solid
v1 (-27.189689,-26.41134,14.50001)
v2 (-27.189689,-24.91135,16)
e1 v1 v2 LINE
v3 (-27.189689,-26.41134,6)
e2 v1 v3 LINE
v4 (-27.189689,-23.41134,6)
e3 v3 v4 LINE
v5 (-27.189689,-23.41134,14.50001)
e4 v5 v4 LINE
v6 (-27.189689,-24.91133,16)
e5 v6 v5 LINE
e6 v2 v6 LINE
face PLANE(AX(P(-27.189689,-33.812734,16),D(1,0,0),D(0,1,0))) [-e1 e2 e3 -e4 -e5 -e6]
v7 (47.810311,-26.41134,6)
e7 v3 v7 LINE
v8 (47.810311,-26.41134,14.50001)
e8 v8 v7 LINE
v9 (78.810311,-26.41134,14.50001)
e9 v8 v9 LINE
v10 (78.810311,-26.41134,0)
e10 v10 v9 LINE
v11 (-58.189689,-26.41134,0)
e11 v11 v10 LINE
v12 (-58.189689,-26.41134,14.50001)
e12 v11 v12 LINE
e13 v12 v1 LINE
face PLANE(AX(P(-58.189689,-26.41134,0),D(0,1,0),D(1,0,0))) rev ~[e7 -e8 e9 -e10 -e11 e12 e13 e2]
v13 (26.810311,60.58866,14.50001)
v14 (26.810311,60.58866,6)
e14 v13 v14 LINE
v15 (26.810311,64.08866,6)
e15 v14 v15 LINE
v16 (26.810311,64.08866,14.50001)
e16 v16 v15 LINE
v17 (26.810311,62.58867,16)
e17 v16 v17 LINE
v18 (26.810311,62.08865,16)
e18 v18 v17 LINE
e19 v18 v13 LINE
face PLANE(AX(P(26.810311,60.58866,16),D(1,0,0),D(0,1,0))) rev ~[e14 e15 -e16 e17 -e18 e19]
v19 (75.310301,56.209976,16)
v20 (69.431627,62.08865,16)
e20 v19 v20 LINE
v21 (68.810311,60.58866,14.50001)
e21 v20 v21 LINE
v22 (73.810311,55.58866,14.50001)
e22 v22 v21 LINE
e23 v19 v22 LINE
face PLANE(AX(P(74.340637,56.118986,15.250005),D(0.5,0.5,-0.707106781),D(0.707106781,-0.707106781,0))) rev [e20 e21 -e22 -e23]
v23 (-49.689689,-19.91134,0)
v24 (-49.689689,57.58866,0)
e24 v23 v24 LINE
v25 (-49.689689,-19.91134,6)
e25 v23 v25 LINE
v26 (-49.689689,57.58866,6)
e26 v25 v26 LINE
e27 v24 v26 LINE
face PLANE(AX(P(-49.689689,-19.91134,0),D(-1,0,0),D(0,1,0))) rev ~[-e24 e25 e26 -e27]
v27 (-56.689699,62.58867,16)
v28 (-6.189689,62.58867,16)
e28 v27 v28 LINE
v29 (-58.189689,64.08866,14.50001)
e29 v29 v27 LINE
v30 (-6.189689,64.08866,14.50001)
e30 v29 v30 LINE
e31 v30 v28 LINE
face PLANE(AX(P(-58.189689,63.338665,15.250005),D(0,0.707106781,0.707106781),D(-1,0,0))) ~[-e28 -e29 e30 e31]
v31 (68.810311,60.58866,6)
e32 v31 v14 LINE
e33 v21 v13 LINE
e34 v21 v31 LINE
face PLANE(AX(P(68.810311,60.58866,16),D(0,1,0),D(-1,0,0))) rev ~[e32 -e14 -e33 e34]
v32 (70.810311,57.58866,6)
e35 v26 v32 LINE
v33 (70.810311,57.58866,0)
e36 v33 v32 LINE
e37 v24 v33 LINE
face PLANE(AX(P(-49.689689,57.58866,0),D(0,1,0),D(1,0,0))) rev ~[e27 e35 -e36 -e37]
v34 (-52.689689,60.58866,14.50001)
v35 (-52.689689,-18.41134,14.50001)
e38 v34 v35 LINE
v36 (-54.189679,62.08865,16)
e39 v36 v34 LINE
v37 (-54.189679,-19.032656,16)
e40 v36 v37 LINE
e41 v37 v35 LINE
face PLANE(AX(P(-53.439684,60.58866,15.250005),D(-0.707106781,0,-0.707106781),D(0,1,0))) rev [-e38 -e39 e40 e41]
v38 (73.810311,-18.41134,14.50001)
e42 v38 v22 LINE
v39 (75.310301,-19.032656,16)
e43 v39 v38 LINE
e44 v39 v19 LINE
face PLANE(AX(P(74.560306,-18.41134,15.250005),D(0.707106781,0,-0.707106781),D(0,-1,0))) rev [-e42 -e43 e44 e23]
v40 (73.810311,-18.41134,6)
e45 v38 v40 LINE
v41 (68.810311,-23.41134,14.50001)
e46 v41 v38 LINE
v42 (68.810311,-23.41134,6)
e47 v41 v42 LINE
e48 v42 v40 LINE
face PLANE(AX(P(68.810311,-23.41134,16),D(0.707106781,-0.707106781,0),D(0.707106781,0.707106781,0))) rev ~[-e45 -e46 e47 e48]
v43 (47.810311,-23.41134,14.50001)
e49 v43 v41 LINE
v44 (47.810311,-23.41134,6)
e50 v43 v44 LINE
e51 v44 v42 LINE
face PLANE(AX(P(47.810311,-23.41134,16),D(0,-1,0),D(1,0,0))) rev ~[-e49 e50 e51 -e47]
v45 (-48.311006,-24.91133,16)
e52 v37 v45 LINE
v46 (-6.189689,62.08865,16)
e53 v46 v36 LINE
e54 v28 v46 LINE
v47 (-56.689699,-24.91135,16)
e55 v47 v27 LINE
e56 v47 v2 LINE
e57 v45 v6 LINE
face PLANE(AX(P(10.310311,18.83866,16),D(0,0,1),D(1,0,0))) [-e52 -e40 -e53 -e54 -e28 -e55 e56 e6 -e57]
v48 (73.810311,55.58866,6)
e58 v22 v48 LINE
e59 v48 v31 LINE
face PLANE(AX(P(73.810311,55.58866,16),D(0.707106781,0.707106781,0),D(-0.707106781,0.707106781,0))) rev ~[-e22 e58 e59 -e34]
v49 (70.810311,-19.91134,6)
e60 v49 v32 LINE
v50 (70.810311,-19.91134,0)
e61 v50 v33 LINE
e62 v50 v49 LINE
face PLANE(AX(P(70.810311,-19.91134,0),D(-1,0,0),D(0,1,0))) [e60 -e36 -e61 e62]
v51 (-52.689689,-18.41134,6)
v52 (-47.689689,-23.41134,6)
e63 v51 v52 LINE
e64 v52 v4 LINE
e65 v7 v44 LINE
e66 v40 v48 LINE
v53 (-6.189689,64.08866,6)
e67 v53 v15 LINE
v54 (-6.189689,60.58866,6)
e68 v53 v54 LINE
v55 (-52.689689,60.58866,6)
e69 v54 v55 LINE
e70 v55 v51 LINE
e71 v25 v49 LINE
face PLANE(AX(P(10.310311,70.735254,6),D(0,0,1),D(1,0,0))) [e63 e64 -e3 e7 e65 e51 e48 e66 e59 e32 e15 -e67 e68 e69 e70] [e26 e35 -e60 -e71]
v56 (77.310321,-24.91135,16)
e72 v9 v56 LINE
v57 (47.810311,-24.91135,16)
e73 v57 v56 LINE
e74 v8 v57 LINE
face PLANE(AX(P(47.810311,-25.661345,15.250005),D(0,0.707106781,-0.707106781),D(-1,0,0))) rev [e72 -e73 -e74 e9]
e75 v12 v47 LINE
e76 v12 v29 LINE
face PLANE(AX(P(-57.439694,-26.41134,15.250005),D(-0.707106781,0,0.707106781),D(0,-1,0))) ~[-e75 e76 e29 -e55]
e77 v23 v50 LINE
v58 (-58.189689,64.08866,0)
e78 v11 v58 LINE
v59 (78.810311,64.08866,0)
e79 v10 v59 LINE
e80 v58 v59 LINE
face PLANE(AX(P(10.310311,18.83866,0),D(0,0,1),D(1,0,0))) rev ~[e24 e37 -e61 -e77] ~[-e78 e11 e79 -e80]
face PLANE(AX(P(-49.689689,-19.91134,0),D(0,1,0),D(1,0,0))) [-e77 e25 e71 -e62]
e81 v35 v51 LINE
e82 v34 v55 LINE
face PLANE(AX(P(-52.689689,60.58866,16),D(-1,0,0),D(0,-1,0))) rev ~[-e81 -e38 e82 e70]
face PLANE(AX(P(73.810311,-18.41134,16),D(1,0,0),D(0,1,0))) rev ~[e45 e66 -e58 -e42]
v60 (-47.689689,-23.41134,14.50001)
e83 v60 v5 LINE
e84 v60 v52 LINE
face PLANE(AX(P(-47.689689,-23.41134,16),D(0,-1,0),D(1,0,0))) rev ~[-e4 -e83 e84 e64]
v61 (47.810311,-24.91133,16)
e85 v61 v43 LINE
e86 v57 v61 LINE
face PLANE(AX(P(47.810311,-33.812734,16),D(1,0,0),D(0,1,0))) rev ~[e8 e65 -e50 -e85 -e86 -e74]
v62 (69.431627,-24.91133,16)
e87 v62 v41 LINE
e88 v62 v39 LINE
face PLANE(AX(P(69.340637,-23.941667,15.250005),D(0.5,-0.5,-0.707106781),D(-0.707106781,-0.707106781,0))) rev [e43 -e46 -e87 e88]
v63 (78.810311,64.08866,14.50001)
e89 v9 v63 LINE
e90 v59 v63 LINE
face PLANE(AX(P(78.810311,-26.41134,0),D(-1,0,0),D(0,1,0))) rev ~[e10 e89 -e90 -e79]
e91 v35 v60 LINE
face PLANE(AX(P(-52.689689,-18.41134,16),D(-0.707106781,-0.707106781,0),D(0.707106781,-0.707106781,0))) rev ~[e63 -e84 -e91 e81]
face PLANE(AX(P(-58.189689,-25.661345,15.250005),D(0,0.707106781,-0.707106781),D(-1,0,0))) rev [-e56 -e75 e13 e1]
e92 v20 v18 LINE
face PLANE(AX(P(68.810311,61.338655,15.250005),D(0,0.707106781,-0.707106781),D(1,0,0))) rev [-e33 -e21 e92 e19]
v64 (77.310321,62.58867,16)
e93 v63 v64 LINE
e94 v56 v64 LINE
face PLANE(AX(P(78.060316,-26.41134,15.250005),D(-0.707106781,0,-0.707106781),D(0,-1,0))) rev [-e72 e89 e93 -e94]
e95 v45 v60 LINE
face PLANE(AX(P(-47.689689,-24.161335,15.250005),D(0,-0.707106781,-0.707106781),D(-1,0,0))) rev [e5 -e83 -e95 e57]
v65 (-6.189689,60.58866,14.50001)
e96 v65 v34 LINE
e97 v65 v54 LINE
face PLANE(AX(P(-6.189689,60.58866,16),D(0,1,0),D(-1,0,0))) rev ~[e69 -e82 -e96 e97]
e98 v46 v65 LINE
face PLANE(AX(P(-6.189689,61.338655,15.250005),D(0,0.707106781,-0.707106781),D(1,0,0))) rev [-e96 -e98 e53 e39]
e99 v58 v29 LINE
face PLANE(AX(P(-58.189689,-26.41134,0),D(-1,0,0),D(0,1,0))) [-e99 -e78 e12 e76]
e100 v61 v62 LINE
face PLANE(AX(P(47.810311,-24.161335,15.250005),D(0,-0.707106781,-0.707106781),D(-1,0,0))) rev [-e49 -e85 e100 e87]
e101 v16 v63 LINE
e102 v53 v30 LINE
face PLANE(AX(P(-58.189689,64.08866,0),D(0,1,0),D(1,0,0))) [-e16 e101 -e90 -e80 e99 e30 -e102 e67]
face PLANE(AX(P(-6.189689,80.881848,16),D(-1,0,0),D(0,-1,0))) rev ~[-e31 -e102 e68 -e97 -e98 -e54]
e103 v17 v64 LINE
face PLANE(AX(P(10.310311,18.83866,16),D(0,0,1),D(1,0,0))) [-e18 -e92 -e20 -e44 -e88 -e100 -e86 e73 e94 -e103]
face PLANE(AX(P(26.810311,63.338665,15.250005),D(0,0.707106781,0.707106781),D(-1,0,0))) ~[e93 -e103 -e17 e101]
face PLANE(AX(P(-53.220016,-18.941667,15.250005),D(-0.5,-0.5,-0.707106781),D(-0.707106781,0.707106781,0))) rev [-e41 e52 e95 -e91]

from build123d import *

# Parameters (mm, degrees)
F0_W     = 137
F0_H     = 90.5
F0_W_2   = 120.5
F0_H_2   = 77.5
F1_DEPTH = 16
F3_W     = 33
F3_H     = 20.2931881964
F3_H_2   = 28.397909285
F3_W_2   = 75
F3_H_3   = 9.5986060599
F3_H_4   = 10.4013939401
F4_DEPTH = 10
F5_SIZE  = 1.49999


# Not quite as in the source:
# - a fillet or chamfer is up to 0.001 mm smaller than in the source, because OpenCascade refuses the exact size
# - a feature names something its author has since deleted; it is built from what else it names


with BuildPart() as f1:
    # F0 (on Top) → F1 (new body)
    with BuildSketch(Plane.XY):
        with Locations((10.3103105978, 18.8386597227)):
            Rectangle(F0_W, F0_H)
        with Locations((10.5603105978, 18.8386597227)):
            Rectangle(F0_W_2, F0_H_2, mode=Mode.SUBTRACT)
    extrude(amount=F1_DEPTH)

    # F3 (on 3pt) → F4 (cut)
    with BuildSketch(Plane.XY.offset(16)):
        with Locations((10.3103105978, 70.7352538208)):
            Rectangle(F3_W, F3_H)
        with Locations((10.3103105978, 46.3897050802)):
            Rectangle(F3_W, F3_H_2)
        Polygon((-6.1896894022, 32.1907504376), (-6.1896894022, 60.5886597227), (-52.6896894022, 60.5886597227), (-52.6896894022, -18.4113402773), (-47.6896894022, -23.4113402773), (-27.1896894022, -23.4113402773), (-27.1896894022, -13.8127342174), (47.8103105978, -13.8127342174), (47.8103105978, -23.4113402773), (68.8103105978, -23.4113402773), (73.8103105978, -18.4113402773), (73.8103105978, 55.5886597227), (68.8103105978, 60.5886597227), (26.8103105978, 60.5886597227), (26.8103105978, 32.1907504376), align=None)
        with Locations((10.3103105978, -18.6120372474)):
            Rectangle(F3_W_2, F3_H_3)
        with Locations((10.3103105978, -28.6120372474)):
            Rectangle(F3_W_2, F3_H_4)
    extrude(amount=-F4_DEPTH, mode=Mode.SUBTRACT)

    # F5 (size 1.5 in the source; OpenCascade refuses exactly that, so slightly less here)
    f5_edges = [f1.edges().sort_by_distance(p)[0] for p in [
        (-52.689689, 21.08866, 16),
        (-29.439689, 60.58866, 16),
        (78.810311, 18.83866, 16),
        (63.310311, -26.41134, 16),
        (52.810311, 64.08866, 16),
        (-32.189689, 64.08866, 16),
        (-58.189689, 18.83866, 16),
        (-42.689689, -26.41134, 16),
        (71.310311, 58.08866, 16),
        (73.810311, 18.58866, 16),
        (71.310311, -20.91134, 16),
        (-50.189689, -20.91134, 16),
        (58.310311, -23.41134, 16),
        (47.810311, 60.58866, 16),
        (-37.439689, -23.41134, 16),
    ]]
    chamfer(f5_edges, length=F5_SIZE)


solid = f1.part
